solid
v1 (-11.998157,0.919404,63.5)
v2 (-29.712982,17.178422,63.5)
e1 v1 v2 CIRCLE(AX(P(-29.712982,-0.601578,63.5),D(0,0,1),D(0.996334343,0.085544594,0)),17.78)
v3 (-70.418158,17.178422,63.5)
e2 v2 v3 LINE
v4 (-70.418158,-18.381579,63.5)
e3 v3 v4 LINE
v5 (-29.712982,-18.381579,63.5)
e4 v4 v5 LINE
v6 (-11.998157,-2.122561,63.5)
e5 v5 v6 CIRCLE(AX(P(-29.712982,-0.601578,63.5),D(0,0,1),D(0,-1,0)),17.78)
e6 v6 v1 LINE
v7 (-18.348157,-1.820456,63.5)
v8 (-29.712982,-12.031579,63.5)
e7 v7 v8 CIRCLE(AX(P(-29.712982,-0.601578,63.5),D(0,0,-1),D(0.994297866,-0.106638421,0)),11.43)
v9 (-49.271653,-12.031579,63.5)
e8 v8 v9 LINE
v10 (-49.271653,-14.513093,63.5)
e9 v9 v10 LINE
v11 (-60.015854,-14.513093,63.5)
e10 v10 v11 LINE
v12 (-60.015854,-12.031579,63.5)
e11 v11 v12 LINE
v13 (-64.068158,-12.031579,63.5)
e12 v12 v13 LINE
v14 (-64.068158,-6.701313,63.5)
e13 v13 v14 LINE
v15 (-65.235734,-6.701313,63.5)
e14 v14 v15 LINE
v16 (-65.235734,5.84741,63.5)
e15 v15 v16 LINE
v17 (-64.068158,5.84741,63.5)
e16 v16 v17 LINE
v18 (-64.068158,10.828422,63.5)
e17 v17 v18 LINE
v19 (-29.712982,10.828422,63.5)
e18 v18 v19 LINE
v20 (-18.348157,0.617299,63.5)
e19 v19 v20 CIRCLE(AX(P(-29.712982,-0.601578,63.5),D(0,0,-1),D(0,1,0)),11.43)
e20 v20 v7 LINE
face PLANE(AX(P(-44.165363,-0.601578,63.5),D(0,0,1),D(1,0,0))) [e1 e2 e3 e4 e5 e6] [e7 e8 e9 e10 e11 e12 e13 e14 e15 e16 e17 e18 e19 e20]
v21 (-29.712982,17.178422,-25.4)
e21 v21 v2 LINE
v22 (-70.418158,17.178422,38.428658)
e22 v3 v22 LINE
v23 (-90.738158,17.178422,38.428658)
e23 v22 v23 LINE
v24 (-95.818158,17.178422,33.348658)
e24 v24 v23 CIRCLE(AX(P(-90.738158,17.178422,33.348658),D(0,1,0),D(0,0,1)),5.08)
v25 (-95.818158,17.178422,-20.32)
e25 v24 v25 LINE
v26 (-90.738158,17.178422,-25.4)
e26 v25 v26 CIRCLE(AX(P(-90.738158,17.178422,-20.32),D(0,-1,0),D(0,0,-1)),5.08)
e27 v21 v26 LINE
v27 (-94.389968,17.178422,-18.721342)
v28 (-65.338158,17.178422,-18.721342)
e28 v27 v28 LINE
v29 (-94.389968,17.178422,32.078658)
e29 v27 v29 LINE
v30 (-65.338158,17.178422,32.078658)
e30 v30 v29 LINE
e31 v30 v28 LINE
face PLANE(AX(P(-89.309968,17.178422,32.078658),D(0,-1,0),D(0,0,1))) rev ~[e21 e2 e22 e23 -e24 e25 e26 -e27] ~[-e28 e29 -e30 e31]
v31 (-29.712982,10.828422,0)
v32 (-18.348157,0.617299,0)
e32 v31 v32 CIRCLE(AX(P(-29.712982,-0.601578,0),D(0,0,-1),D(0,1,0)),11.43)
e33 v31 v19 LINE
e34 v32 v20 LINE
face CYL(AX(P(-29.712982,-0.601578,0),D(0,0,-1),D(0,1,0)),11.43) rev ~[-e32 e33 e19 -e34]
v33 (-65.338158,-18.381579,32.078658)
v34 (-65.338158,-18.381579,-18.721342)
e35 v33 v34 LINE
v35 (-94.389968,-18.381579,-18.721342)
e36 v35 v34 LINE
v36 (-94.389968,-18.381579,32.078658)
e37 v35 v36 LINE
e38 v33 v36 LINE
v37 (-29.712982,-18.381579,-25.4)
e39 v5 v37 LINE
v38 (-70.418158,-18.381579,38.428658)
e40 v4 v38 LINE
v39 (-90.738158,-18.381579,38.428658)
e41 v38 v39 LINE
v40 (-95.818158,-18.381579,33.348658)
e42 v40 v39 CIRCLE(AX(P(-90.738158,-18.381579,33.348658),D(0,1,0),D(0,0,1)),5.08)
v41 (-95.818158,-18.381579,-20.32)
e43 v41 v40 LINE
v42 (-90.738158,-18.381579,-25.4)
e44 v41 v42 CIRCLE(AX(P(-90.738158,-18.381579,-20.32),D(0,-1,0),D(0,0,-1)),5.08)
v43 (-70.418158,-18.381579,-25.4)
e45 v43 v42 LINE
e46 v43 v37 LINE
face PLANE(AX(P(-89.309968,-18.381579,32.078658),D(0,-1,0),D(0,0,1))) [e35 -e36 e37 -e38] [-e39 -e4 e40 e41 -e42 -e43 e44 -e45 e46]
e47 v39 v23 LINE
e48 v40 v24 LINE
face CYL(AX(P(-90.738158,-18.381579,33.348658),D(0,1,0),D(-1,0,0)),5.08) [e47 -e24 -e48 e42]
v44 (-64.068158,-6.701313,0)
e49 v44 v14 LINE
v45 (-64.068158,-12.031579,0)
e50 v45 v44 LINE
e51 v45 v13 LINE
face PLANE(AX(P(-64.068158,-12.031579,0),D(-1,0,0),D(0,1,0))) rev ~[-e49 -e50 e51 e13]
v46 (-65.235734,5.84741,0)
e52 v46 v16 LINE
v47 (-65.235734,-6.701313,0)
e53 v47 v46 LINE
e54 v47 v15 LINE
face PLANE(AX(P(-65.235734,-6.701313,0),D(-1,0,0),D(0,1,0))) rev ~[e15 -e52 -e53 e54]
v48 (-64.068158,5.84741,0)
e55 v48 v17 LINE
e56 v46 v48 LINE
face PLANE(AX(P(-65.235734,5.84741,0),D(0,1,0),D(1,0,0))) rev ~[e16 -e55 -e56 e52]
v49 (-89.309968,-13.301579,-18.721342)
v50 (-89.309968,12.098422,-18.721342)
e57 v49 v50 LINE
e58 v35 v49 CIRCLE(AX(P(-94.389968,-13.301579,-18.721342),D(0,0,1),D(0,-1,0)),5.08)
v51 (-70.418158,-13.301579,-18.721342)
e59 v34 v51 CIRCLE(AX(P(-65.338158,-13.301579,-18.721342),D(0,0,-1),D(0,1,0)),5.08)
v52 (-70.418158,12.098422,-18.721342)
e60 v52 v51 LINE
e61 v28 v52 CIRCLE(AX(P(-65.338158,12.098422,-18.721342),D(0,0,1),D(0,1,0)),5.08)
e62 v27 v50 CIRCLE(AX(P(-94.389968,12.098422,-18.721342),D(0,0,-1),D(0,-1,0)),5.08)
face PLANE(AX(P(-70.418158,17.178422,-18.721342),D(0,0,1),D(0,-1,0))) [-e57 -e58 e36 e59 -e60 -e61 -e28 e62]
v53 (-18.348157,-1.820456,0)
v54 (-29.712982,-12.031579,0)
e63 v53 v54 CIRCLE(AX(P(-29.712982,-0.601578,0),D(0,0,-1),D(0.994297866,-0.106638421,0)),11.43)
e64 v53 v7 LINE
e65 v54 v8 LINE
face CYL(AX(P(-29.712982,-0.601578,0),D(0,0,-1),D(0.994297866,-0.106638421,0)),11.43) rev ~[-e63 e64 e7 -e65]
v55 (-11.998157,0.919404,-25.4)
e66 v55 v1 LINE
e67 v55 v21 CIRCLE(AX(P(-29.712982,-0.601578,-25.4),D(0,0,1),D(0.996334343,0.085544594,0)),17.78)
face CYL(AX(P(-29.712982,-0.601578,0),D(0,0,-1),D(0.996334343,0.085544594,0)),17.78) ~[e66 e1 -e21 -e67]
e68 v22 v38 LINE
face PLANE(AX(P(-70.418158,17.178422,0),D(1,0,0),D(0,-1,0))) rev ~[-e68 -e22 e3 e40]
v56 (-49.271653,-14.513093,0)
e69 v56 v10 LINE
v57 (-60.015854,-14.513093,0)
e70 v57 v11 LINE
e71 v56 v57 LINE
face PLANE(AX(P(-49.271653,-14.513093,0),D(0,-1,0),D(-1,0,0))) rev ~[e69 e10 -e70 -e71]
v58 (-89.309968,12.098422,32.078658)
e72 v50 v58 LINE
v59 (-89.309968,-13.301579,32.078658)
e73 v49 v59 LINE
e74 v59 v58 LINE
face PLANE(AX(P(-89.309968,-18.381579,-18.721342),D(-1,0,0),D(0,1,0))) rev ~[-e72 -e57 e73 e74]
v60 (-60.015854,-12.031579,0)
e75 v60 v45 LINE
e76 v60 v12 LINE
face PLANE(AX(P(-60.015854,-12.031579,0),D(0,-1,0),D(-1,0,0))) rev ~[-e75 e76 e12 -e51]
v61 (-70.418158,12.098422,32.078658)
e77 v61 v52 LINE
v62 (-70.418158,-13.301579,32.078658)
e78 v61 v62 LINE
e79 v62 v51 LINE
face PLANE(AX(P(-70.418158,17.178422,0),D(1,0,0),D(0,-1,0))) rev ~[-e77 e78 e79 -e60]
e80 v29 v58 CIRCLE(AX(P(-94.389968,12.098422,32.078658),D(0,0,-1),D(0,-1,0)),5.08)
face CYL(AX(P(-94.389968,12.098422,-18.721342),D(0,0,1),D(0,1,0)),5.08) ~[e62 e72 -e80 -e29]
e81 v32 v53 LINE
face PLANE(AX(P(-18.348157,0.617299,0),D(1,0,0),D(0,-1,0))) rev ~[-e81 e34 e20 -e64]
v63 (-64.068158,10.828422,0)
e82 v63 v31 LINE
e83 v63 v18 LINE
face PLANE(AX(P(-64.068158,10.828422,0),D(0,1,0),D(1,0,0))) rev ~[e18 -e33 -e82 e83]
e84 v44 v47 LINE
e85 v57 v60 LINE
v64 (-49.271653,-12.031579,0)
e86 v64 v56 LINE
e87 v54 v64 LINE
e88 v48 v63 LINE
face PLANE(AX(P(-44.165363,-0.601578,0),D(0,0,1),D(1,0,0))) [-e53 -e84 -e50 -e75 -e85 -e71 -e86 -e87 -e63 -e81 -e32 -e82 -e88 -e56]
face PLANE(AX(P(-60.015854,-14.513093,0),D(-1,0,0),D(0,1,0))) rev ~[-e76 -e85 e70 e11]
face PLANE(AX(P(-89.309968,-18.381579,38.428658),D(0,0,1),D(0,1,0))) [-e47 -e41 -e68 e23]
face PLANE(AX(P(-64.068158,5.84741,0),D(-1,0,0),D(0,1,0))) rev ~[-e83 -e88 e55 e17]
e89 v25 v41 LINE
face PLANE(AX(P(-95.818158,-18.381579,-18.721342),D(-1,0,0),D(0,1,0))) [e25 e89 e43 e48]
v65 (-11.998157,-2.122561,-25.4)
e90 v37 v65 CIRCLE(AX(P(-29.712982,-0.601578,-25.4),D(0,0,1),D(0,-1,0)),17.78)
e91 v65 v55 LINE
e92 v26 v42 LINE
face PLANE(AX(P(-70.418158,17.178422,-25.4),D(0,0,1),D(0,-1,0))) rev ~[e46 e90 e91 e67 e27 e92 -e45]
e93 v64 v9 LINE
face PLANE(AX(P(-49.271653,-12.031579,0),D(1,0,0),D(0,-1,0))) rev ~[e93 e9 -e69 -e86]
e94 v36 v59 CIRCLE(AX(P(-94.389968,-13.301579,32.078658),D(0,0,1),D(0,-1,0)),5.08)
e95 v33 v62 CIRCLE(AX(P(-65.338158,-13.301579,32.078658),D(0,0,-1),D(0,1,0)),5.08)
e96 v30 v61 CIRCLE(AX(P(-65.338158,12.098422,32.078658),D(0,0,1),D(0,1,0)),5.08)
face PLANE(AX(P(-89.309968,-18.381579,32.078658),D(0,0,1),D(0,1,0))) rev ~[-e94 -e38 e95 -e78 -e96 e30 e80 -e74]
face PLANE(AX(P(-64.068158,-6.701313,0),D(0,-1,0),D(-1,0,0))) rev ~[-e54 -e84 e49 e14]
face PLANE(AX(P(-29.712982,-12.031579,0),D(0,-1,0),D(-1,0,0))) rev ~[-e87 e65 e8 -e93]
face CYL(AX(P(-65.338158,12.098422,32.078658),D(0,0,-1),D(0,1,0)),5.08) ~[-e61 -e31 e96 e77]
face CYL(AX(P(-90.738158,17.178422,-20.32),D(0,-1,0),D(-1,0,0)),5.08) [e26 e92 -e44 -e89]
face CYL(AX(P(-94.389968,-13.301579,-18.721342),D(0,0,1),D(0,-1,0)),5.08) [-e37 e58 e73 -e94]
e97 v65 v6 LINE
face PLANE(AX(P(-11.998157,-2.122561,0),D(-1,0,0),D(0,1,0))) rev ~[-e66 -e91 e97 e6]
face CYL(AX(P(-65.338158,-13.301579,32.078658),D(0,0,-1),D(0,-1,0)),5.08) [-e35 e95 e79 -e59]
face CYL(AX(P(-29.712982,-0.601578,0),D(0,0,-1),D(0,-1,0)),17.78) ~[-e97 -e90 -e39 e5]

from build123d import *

# Parameters (mm, degrees)
F2_DEPTH  = 6.35
F3_DEPTH  = 25.4
F5_DEPTH  = 63.5
F6_W      = 35.5600007778
F6_H      = 6.6786579132
F7_DEPTH  = 25.4
F8_W      = 6.5081897405
F8_H      = 35.5600007778
F9_DEPTH  = 57.15
F10_W     = 35.5600007778
F10_H     = 6.35
F11_DEPTH = 19.05
F12_R     = 5.08
F13_R     = 5.08
F14_R     = 5.08
F15_R     = 5.08
F16_R     = 5.08


# Not quite as in the source:
# - two fillets or chamfers of one size are made in one step


with BuildPart() as f2:
    # F0 (on Top) → F2 (new body)
    with BuildSketch(Plane.XY):
        with BuildLine():
            ThreePointArc((-18.3481574059, -1.8204556262), (-18.2829820174, -0.6015784588), (-18.3481574059, 0.6172987085))
            Line((-18.3481574059, 0.6172987085), (-18.3481574059, -1.8204556262))
        make_face()
        with BuildLine():
            Line((-29.7129820174, 10.8284215412), (-64.0681574059, 10.8284215412))
            Line((-64.0681574059, 10.8284215412), (-64.0681574059, 5.8474093676))
            Line((-64.0681574059, 5.8474093676), (-65.235733552, 5.8474093676))
            Line((-65.235733552, 5.8474093676), (-65.235733552, -6.7013129592))
            Line((-65.235733552, -6.7013129592), (-64.0681574059, -6.7013129592))
            Line((-64.0681574059, -6.7013129592), (-64.0681574059, -12.0315784588))
            Line((-64.0681574059, -12.0315784588), (-60.0158534944, -12.0315784588))
            Line((-60.0158534944, -12.0315784588), (-60.0158534944, -14.5130921155))
            Line((-60.0158534944, -14.5130921155), (-49.2716534944, -14.5130921155))
            Line((-49.2716534944, -14.5130921155), (-49.2716534944, -12.0315784588))
            Line((-49.2716534944, -12.0315784588), (-29.7129820174, -12.0315784588))
            ThreePointArc((-29.7129820174, -12.0315784588), (-22.0738350108, -9.1038330429), (-18.3481574059, -1.8204556262))
            Line((-18.3481574059, -1.8204556262), (-18.3481574059, 0.6172987085))
            ThreePointArc((-18.3481574059, 0.6172987085), (-22.0738350108, 7.9006761252), (-29.7129820174, 10.8284215412))
        make_face()
    extrude(amount=-F2_DEPTH)

    # F1 (on Top) → F3 (join)
    with BuildSketch(Plane.XY):
        with BuildLine():
            Line((-42.9216531055, -18.3815788478), (-29.7129820174, -18.3815788478))
            ThreePointArc((-29.7129820174, -18.3815788478), (-17.6903920931, -13.7006526758), (-11.9981570169, -2.1225613757))
            Line((-11.9981570169, -2.1225613757), (-11.9981570169, 0.919404458))
            ThreePointArc((-11.9981570169, 0.919404458), (-17.6903920931, 12.4974957581), (-29.7129820174, 17.1784219301))
            Line((-29.7129820174, 17.1784219301), (-70.4181577948, 17.1784219301))
            Line((-70.4181577948, 17.1784219301), (-70.4181577948, 12.1974097565))
            Line((-70.4181577948, 12.1974097565), (-70.4181577948, -13.0513133481))
            Line((-70.4181577948, -13.0513133481), (-70.4181577948, -18.3815788478))
            Line((-70.4181577948, -18.3815788478), (-66.3658538833, -18.3815788478))
            Line((-66.3658538833, -18.3815788478), (-42.9216531055, -18.3815788478))
        make_face()
    extrude(amount=-F3_DEPTH)

    # F4 (on face) → F5 (join)
    with BuildSketch(Plane.XY):
        with BuildLine():
            Line((-42.9216538833, -18.3815788478), (-29.7129820174, -18.3815788478))
            ThreePointArc((-29.7129820174, -18.3815788478), (-17.6903920931, -13.7006526758), (-11.9981570169, -2.1225613757))
            Line((-11.9981570169, -2.1225613757), (-11.9981570169, 0.919404458))
            ThreePointArc((-11.9981570169, 0.919404458), (-17.6903920931, 12.4974957581), (-29.7129820174, 17.1784219301))
            Line((-29.7129820174, 17.1784219301), (-70.4181577948, 17.1784219301))
            Line((-70.4181577948, 17.1784219301), (-70.4181577948, 12.1974097565))
            Line((-70.4181577948, 12.1974097565), (-70.4181577948, -13.0513133481))
            Line((-70.4181577948, -13.0513133481), (-70.4181577948, -18.3815788478))
            Line((-70.4181577948, -18.3815788478), (-66.3658538833, -18.3815788478))
            Line((-66.3658538833, -18.3815788478), (-42.9216538833, -18.3815788478))
        make_face()
        with BuildLine():
            Line((-65.2357339409, 5.8474097565), (-64.0681577948, 5.8474097565))
            Line((-64.0681577948, 5.8474097565), (-64.0681577948, 10.8284219301))
            Line((-64.0681577948, 10.8284219301), (-29.7129820174, 10.8284219301))
            ThreePointArc((-29.7129820174, 10.8284219301), (-22.0738347431, 7.9006764075), (-18.3481570169, 0.6172987293))
            Line((-18.3481570169, 0.6172987293), (-18.3481570169, -1.820455647))
            ThreePointArc((-18.3481570169, -1.820455647), (-22.0738347431, -9.1038333252), (-29.7129820174, -12.0315788478))
            Line((-29.7129820174, -12.0315788478), (-49.2716531055, -12.0315788478))
            Line((-49.2716531055, -12.0315788478), (-49.2716531055, -14.5130925044))
            Line((-49.2716531055, -14.5130925044), (-60.0158538833, -14.5130925044))
            Line((-60.0158538833, -14.5130925044), (-60.0158538833, -12.0315788478))
            Line((-60.0158538833, -12.0315788478), (-64.0681577948, -12.0315788478))
            Line((-64.0681577948, -12.0315788478), (-64.0681577948, -6.7013133481))
            Line((-64.0681577948, -6.7013133481), (-65.2357339409, -6.7013133481))
            Line((-65.2357339409, -6.7013133481), (-65.2357339409, 5.8474097565))
        make_face(mode=Mode.SUBTRACT)
    extrude(amount=F5_DEPTH)

    # F6 (on face) → F7 (join)
    with BuildSketch(Plane(origin=(-70.4181577948, 0, 0), x_dir=(0, -1, 0), z_dir=(-1, 0, 0))):
        with Locations((0.6015784588, -22.0606710434)):
            Rectangle(F6_W, F6_H)
    extrude(amount=F7_DEPTH)

    # F8 (on face) → F9 (join)
    with BuildSketch(Plane.XY.offset(-18.7213420868)):
        with Locations((-92.5640629245, -0.6015784588)):
            Rectangle(F8_W, F8_H)
    extrude(amount=F9_DEPTH)

    # F10 (on face) → F11 (join)
    with BuildSketch(Plane.YZ.offset(-89.3099680543)):
        with Locations((-0.6015784588, 35.2536579132)):
            Rectangle(F10_W, F10_H)
    extrude(amount=F11_DEPTH)

    # F12
    f12_edges = [f2.edges().sort_by_distance(p)[0] for p in [
        (-95.818158, -0.601578, 38.428658),
    ]]
    fillet(f12_edges, radius=F12_R)

    # F13
    f13_edges = [f2.edges().sort_by_distance(p)[0] for p in [
        (-95.818158, -0.601578, -25.4),
    ]]
    fillet(f13_edges, radius=F13_R)

    # F14
    f14_edges = [f2.edges().sort_by_distance(p)[0] for p in [
        (-70.418158, -18.381579, 6.678658),
    ]]
    fillet(f14_edges, radius=F14_R)

    # F15
    f15_edges = [f2.edges().sort_by_distance(p)[0] for p in [
        (-70.418158, 17.178422, 6.678658),
    ]]
    fillet(f15_edges, radius=F15_R)

    # F16
    f16_edges = [f2.edges().sort_by_distance(p)[0] for p in [
        (-89.309968, 17.178422, 6.678658),
        (-89.309968, -18.381579, 6.678658),
    ]]
    fillet(f16_edges, radius=F16_R)


solid = f2.part
